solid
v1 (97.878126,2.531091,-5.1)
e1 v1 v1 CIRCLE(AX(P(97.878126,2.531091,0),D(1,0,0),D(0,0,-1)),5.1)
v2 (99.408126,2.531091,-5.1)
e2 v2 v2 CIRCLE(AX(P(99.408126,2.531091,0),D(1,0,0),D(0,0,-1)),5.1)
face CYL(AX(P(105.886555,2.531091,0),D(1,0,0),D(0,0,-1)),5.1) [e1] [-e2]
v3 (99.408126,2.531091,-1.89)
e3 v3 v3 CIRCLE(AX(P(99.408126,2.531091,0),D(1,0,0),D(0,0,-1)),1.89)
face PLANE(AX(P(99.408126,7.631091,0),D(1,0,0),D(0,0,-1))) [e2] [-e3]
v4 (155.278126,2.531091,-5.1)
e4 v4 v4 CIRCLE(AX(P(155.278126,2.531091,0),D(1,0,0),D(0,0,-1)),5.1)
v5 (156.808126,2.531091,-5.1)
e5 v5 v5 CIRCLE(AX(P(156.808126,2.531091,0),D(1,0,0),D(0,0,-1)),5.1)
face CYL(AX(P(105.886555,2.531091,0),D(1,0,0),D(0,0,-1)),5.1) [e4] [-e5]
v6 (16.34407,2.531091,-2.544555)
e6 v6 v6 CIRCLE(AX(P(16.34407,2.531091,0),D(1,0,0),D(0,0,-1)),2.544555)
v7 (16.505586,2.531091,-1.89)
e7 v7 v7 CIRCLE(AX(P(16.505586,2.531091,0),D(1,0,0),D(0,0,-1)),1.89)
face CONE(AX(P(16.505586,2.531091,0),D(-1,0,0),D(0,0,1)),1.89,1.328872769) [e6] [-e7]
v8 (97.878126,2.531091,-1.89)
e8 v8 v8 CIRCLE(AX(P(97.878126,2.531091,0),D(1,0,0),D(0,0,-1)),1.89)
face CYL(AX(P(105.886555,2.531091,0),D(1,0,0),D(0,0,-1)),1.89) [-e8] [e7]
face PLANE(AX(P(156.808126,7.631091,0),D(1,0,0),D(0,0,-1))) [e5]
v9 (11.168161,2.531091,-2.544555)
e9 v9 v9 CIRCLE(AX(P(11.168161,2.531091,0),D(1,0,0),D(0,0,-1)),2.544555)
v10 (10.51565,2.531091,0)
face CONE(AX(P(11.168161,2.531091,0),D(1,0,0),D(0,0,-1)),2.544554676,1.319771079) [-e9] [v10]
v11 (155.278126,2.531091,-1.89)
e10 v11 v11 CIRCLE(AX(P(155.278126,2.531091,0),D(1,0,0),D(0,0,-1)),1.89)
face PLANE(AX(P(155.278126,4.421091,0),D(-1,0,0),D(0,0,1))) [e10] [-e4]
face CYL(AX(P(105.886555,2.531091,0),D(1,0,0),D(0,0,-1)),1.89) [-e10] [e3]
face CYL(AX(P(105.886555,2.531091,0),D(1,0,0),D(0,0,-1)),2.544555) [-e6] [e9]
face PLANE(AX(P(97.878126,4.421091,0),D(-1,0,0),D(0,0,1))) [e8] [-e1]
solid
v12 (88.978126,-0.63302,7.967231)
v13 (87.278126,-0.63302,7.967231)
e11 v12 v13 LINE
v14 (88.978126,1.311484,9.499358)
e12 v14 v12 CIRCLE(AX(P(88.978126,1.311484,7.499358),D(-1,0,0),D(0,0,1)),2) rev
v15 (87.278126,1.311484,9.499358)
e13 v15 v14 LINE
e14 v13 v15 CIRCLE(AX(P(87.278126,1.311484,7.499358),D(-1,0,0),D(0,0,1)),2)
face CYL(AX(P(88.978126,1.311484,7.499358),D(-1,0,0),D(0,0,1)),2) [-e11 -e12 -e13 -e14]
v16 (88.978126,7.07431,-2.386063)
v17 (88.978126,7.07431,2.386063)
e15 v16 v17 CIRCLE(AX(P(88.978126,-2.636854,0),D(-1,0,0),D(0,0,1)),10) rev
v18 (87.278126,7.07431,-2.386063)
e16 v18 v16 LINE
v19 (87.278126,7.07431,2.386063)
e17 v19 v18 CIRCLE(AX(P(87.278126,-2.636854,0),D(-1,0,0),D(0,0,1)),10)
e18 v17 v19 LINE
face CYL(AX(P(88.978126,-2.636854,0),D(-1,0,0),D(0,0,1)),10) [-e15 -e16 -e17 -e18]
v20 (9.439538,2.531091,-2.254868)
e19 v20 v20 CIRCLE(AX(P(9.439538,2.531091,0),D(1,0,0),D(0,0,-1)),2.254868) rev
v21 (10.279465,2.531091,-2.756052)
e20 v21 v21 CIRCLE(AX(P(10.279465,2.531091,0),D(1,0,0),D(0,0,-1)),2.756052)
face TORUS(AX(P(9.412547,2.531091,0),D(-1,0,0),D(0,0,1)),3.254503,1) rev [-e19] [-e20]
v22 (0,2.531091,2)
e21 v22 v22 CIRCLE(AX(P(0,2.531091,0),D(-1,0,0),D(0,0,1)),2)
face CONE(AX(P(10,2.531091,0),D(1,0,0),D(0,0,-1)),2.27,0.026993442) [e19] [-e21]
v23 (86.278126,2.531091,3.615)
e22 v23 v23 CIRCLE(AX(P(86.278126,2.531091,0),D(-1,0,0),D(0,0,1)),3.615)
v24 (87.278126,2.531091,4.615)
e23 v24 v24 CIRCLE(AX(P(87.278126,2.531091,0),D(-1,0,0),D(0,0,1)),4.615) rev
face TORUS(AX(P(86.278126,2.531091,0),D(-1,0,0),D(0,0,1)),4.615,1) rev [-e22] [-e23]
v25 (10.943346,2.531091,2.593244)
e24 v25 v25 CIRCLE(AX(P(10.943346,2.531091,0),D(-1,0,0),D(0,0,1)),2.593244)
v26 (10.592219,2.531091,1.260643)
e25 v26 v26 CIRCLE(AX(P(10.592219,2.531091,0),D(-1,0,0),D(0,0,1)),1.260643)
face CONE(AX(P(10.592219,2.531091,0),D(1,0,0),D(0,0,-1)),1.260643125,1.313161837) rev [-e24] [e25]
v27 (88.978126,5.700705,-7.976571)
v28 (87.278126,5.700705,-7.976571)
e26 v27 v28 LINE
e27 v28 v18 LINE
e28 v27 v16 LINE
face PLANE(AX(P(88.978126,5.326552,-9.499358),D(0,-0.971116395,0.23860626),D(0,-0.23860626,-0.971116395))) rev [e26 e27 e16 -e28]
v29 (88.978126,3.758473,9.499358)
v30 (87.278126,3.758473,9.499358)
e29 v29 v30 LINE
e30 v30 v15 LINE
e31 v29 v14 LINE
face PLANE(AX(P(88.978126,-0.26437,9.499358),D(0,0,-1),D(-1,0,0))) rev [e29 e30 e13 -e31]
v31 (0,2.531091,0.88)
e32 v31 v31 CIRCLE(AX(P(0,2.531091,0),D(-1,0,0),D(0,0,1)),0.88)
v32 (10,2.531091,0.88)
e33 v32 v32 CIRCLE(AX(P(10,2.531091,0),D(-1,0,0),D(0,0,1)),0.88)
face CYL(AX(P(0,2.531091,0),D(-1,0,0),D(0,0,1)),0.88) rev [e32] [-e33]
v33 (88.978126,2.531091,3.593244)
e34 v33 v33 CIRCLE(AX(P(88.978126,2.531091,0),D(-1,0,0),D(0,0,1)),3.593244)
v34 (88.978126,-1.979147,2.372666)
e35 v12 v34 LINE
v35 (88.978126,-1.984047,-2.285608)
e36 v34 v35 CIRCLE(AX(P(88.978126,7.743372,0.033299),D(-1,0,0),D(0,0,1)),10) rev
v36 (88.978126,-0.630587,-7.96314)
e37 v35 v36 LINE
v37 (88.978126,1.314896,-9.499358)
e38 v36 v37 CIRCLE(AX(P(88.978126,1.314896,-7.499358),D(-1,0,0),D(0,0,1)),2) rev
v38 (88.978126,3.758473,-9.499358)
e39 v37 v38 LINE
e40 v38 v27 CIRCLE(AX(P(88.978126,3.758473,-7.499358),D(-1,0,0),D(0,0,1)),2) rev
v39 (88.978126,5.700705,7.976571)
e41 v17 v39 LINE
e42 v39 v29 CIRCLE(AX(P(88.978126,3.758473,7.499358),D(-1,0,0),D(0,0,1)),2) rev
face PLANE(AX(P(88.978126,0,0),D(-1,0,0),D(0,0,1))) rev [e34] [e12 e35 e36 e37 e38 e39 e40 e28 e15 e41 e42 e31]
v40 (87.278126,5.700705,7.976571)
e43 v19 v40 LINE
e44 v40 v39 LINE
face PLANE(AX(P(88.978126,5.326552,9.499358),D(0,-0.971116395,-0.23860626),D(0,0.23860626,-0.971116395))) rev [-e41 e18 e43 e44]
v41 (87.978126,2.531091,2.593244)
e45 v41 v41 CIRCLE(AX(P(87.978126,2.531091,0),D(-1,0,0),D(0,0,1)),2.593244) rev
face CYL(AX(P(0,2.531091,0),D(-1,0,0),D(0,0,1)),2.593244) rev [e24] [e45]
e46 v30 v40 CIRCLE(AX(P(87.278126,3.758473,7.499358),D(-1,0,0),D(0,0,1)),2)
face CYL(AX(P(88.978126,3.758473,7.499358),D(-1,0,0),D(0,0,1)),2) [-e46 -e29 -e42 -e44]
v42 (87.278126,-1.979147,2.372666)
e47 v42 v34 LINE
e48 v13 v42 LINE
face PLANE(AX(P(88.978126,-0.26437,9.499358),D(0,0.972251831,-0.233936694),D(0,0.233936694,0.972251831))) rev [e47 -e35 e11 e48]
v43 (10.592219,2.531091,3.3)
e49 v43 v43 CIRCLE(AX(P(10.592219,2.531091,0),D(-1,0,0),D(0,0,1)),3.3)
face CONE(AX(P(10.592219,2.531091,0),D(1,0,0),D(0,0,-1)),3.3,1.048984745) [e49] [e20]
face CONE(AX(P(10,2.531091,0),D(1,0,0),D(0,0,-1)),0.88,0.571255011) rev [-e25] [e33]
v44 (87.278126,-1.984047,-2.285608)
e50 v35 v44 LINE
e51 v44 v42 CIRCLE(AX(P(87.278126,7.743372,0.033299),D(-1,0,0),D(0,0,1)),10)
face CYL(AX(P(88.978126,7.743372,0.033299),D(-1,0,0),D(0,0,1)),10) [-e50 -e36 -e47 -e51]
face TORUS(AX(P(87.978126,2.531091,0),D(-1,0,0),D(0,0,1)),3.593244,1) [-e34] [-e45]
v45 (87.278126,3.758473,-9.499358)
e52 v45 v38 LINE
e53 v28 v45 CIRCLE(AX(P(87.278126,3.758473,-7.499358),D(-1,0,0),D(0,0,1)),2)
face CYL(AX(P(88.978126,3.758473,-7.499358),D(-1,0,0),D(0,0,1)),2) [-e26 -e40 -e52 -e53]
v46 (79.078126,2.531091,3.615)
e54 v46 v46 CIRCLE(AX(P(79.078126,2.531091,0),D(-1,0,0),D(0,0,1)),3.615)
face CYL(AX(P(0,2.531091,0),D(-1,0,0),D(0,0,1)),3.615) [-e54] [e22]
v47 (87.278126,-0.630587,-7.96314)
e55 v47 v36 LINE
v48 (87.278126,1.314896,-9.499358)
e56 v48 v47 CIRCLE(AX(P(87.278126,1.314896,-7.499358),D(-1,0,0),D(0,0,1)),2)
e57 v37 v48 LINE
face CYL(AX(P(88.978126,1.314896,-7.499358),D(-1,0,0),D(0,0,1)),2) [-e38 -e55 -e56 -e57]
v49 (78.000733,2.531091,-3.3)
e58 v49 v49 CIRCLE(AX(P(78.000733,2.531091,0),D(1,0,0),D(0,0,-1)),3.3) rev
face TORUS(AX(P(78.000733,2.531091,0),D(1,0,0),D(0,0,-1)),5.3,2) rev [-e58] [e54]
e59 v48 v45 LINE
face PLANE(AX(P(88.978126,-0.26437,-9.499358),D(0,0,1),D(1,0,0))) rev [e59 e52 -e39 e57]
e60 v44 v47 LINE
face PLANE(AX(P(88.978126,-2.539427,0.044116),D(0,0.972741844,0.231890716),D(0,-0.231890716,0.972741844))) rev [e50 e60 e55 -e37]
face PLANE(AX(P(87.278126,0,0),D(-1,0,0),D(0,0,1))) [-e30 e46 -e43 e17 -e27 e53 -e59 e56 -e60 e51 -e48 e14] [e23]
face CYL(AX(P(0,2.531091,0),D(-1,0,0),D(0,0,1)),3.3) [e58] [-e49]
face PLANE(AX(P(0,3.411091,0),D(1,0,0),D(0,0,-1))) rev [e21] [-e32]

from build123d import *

# Parameters (mm, degrees)
BOSS_EXTRUDE1_START = 1.7
SKETCH3_R           = 2.593243827
BOSS_EXTRUDE1_DEPTH = 1.7
FILLET1_R           = 10
FILLET2_R           = 2
FILLET3_R           = 1


with BuildPart() as part:
    # Sketch1 → Revolve2 (revolve)
    with BuildSketch(Plane.XY, mode=Mode.PRIVATE) as revolve2_sk:
        Polygon((0, 3.41109089), (10, 3.41109089), (10.592218891, 3.791734015), (10.943346142, 5.124334717), (87.2781258, 5.124334717), (87.2781258, 6.14609089), (79.0781258, 6.14609089), (78.592218891, 5.83109089), (10.592218891, 5.83109089), (10, 4.80109089), (0, 4.53109089), align=None)
    revolve(revolve2_sk.sketch.rotate(Axis((0, 2.53109089, 0), (1, 0, 0)), 90), axis=Axis((0, 2.53109089, 0), (1, 0, 0)))

    # Sketch3 → Boss-Extrude1 (add)
    with BuildSketch(Plane(origin=(87.2781258, 0, 0), x_dir=(0, 0, -1), z_dir=(1, 0, 0)).offset(BOSS_EXTRUDE1_START)):
        Polygon((-9.499358108, 5.326551853), (0, 7.660573112), (9.499358108, 5.326551853), (9.499358108, -0.264370073), (-0.044115668, -2.539426888), (-9.499358108, -0.264370073), align=None)
        with Locations(Location((0, 2.53109089, 0), (0, 0, 180))):
            Circle(SKETCH3_R, mode=Mode.SUBTRACT)
    extrude(amount=-BOSS_EXTRUDE1_DEPTH)

    # Fillet1
    fillet1_edges = [part.edges().sort_by_distance(p)[0] for p in [
        (88.1281258, 7.660573112, 0),
        (88.1281258, -2.539426888, 0.044115668),
    ]]
    fillet(fillet1_edges, radius=FILLET1_R)

    # Fillet2
    # the kernel refuses this fillet: 2 mm, written as the material it adds along each edge
    with BuildSketch(Plane(origin=(78.592218891, 2.53109089, 0), x_dir=(0, 0, 1), z_dir=(0, 1, 0))) as fillet2_piece_1_section:
        with BuildLine():
            CenterArc((3.3 + FILLET2_R, -FILLET2_R * 0.295779032627), FILLET2_R, 147.045775179, 32.954224821)
            Line((3.3, -FILLET2_R * 0.295779032627), (3.3, 0))
            Line((3.3, 0), (3.3 + FILLET2_R * 0.160894572606, FILLET2_R * 0.248189791587))
        make_face()
    fillet2_piece_1 = revolve(axis=Axis((78.592218891, 2.53109089, 0), (1, 0, 0)), mode=Mode.PRIVATE)
    fillet2_piece_1 = fillet2_piece_1 & Plane(origin=(78.565259798, 2.53109089, 0), x_dir=(0, 0, 1), z_dir=(-1, 0, 0)) * Cylinder(3.615, 15, mode=Mode.PRIVATE)
    add(fillet2_piece_1)
    # the kernel refuses this fillet: 2 mm, written as the material it takes off along each edge
    with BuildSketch(Plane(origin=(92.926291949, -0.264370073, -9.499358108), x_dir=(0, 1, 0), z_dir=(-1, 0, 0))) as fillet2_2_piece_1:
        with BuildLine():
            CenterArc((FILLET2_R * 0.789633229804, -FILLET2_R), FILLET2_R, 90, 76.591588328)
            Line((-FILLET2_R * 0.183108614693, -FILLET2_R * 0.768109284435), (0, 0))
            Line((0, 0), (FILLET2_R * 0.789633229804, 0))
        make_face()
    extrude(amount=9.596332298, mode=Mode.SUBTRACT)
    with BuildSketch(Plane(origin=(92.898323954, 5.326551853, -9.499358108), x_dir=(0, 0.23860626001544996, 0.9711163950224707), z_dir=(-1, 0, 0))) as fillet2_2_piece_2:
        with BuildLine():
            CenterArc((FILLET2_R * 0.784039630972, -FILLET2_R), FILLET2_R, 90, 76.195704702)
            Line((-FILLET2_R * 0.18707676405, -FILLET2_R * 0.761393739985), (0, 0))
            Line((0, 0), (FILLET2_R * 0.784039630972, 0))
        make_face()
    extrude(amount=9.54039631, mode=Mode.SUBTRACT)
    with BuildSketch(Plane(origin=(92.898323954, 5.326551853, 9.499358108), x_dir=(0, 0.23860626001544943, -0.9711163950224709), z_dir=(-1, 0, 0))) as fillet2_2_piece_3:
        with BuildLine():
            CenterArc((FILLET2_R * 0.784039630972, FILLET2_R), FILLET2_R, 193.804295298, 76.195704702)
            Line((-FILLET2_R * 0.18707676405, FILLET2_R * 0.761393739985), (0, 0))
            Line((0, 0), (FILLET2_R * 0.784039630972, 0))
        make_face()
    extrude(amount=9.54039631, mode=Mode.SUBTRACT)
    with BuildSketch(Plane(origin=(92.917759965, -0.264370073, 9.499358108), x_dir=(0, 1, 0), z_dir=(-1, 0, 0))) as fillet2_2_piece_4:
        with BuildLine():
            CenterArc((FILLET2_R * 0.787926833026, FILLET2_R), FILLET2_R, 193.528952804, 76.471047196)
            Line((-FILLET2_R * 0.184324998206, FILLET2_R * 0.766063306286), (0, 0))
            Line((0, 0), (FILLET2_R * 0.787926833026, 0))
        make_face()
    extrude(amount=9.57926833, mode=Mode.SUBTRACT)

    # Fillet3
    fillet3_edges = [part.edges().sort_by_distance(p)[0] for p in [
        (10, 2.53109089, -2.27),
        (87.2781258, 2.53109089, -3.615),
        (88.9781258, 2.53109089, -2.593243827),
    ]]
    fillet(fillet3_edges, radius=FILLET3_R)


with BuildPart() as body_2:
    # Sketch2 → Revolve3 (revolve)
    with BuildSketch(Plane.XY, mode=Mode.PRIVATE) as revolve3_sk:
        Polygon((10.515649659, 2.53109089), (11.168160759, 5.075645566), (16.344070093, 5.075645566), (16.50558566, 4.42109089), (97.8781258, 4.42109089), (97.8781258, 7.63109089), (99.4081258, 7.63109089), (99.4081258, 4.42109089), (155.2781258, 4.42109089), (155.2781258, 7.63109089), (156.8081258, 7.63109089), (156.8081258, 2.53109089), align=None)
    revolve(revolve3_sk.sketch.rotate(Axis((105.886554745, 2.53109089, 0), (-1, 0, 0)), 90), axis=Axis((105.886554745, 2.53109089, 0), (-1, 0, 0)))


solid = Compound([part.part, body_2.part])
